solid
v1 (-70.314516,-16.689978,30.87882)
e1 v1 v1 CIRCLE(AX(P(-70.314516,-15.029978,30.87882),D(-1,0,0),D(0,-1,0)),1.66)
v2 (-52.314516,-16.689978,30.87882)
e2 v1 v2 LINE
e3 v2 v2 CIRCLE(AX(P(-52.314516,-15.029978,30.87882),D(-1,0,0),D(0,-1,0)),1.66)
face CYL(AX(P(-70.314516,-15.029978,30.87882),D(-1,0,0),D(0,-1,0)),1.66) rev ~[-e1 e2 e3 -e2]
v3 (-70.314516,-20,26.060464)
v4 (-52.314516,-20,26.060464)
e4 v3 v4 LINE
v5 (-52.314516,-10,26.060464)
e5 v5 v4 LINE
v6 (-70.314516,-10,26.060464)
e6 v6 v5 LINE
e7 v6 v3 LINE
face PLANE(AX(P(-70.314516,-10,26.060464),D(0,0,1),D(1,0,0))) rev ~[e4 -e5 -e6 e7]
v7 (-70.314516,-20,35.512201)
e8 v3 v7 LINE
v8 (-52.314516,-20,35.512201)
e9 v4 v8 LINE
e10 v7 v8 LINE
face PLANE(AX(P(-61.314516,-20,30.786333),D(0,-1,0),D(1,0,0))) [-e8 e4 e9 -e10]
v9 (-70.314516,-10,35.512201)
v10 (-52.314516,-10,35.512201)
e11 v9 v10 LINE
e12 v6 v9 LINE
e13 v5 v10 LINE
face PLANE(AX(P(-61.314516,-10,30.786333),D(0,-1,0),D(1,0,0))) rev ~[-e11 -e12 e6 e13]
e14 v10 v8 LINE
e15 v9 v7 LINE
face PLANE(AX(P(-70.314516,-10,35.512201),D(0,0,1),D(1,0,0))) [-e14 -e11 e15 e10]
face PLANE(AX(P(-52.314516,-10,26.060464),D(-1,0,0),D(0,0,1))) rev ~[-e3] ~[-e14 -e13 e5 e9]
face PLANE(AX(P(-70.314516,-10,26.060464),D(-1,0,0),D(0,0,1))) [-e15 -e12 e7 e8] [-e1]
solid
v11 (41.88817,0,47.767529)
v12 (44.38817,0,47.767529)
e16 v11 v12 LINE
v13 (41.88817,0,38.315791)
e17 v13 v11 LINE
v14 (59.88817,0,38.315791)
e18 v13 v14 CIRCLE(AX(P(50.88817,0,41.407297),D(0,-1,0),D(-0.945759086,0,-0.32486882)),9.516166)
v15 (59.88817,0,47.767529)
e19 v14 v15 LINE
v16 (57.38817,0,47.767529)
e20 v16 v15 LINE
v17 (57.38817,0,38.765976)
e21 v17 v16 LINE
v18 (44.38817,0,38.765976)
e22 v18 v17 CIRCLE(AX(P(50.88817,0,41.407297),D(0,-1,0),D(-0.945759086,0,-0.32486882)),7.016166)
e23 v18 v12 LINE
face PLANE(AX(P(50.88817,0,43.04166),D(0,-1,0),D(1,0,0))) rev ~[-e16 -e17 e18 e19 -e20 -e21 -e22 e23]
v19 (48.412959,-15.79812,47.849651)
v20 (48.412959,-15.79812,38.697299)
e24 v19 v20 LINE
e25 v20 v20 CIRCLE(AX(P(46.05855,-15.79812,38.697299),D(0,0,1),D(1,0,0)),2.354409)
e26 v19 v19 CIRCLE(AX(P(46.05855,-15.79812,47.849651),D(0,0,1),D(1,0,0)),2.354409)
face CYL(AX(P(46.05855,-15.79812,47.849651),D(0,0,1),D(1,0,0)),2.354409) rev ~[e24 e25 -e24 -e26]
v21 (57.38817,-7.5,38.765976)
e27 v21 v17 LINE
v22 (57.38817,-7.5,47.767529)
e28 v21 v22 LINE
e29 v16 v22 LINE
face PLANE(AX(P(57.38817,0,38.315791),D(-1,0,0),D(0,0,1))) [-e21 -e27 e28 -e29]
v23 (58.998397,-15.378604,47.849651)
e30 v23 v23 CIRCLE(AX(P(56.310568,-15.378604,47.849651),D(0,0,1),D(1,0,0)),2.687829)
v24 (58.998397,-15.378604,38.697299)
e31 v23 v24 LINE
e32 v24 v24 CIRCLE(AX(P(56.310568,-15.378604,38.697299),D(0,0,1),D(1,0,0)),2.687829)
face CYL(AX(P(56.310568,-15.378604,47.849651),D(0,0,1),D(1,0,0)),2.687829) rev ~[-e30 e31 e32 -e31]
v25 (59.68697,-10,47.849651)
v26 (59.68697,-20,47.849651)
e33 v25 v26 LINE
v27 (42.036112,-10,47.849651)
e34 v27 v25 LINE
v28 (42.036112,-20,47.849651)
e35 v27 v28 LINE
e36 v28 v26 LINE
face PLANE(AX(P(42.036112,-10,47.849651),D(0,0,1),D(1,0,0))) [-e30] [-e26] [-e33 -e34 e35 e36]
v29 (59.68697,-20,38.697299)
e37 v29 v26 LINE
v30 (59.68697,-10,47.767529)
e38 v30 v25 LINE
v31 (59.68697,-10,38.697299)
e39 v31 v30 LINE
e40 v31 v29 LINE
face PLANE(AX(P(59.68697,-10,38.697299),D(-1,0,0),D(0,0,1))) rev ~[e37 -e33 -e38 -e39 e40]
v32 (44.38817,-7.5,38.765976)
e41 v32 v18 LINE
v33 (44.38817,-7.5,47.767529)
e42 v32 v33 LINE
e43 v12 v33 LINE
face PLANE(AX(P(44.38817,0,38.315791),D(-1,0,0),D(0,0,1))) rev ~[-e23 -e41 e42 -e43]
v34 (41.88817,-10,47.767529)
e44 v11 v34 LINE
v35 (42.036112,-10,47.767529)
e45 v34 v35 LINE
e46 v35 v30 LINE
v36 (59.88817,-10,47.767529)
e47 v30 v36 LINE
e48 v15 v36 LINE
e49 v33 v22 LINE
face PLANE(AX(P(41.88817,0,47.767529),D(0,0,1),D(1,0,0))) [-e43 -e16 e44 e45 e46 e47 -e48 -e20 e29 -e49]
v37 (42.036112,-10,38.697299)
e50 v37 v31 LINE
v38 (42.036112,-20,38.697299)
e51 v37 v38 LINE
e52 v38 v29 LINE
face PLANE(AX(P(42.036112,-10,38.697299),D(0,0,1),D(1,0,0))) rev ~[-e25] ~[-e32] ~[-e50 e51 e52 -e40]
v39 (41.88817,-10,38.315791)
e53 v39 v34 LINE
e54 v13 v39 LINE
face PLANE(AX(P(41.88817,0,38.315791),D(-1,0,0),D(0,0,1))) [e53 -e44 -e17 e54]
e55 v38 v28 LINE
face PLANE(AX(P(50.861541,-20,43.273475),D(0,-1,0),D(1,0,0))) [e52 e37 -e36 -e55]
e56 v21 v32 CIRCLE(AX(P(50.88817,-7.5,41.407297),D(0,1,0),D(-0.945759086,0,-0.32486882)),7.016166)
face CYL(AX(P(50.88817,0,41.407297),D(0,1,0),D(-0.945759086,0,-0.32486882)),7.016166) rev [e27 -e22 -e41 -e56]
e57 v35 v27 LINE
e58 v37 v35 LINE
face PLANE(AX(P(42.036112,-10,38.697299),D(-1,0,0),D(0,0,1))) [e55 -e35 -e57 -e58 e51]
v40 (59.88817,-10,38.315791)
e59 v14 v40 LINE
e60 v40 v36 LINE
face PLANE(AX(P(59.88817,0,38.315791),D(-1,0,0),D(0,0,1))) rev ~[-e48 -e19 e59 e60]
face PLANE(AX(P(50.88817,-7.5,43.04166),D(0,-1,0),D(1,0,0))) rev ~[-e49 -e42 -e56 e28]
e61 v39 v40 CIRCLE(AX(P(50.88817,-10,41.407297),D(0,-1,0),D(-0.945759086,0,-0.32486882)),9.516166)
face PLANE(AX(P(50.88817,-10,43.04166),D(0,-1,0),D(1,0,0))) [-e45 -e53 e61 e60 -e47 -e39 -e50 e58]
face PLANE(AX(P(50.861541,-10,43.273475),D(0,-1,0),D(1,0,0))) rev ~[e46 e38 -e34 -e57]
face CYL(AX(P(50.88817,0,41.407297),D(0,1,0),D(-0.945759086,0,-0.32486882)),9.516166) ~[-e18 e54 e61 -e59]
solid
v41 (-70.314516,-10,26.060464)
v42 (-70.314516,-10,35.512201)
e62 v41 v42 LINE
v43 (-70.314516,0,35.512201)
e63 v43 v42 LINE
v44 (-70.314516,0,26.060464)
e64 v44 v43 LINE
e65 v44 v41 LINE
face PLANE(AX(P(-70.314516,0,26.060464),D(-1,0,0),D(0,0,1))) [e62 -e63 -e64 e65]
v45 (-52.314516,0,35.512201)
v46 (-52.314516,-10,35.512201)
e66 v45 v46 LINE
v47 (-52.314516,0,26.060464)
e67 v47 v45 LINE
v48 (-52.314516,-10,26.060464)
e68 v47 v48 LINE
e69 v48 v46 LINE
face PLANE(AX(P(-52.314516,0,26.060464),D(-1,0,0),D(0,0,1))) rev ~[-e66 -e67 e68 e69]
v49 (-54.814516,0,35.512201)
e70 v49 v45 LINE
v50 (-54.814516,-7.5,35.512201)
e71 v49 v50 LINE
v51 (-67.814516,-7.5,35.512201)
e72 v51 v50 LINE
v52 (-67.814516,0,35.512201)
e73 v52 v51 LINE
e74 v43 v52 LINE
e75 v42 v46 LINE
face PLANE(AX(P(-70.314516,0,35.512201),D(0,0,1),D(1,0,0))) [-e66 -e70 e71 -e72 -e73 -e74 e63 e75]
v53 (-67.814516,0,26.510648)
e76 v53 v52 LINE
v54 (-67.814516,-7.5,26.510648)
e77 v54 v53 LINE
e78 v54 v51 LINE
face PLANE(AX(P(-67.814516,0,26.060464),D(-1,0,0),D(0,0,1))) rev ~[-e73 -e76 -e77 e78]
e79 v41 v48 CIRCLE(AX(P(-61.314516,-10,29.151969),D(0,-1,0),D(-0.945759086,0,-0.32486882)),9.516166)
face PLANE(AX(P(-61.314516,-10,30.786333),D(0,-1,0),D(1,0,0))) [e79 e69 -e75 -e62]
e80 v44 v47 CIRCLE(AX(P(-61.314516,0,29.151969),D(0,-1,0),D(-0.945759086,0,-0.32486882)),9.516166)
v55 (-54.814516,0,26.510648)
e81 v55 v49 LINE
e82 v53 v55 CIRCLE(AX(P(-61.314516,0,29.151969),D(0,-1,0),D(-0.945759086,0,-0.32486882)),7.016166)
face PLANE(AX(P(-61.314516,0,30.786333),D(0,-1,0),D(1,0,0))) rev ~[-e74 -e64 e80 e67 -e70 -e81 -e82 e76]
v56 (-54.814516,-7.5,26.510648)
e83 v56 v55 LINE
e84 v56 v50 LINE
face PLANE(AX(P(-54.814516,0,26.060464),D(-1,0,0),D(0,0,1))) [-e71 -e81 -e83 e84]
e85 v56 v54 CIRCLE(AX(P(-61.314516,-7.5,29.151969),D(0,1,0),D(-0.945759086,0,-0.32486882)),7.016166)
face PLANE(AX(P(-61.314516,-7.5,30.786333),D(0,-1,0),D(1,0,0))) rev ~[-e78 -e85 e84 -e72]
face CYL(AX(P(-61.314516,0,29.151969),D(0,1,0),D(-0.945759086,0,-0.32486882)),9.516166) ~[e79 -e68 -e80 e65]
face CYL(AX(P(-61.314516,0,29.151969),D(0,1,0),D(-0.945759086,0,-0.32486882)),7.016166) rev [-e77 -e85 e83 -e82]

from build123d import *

# Parameters (mm, degrees)
F0_W     = 18
F0_H     = 9.451737664
F1_DEPTH = 10
F2_T     = -2.5
F2_2_T   = -2.5
F3_W     = 18
F3_H     = 9.451737664
F4_DEPTH = 10
F3_W_2   = 17.6508575678
F3_H_2   = 9.1523528099
F5_R     = 2.6878293193
F5_R_2   = 2.3544087044
F6_DEPTH = 25
F7_R     = 1.66
F8_DEPTH = 25


with BuildPart() as f1:
    # F0 (on Front) → F1 (new body)
    with BuildSketch(Plane.XZ):
        with Locations((-61.3145157695, 30.7863325212)):
            Rectangle(F0_W, F0_H)
        with BuildLine():
            Line((-52.3145157695, 26.0604636891), (-70.3145157695, 26.0604636891))
            ThreePointArc((-70.3145157695, 26.0604636891), (-61.3145157695, 19.6358036407), (-52.3145157695, 26.0604636891))
        make_face()
    extrude(amount=F1_DEPTH)

    # F2
    f2_openings = [f1.faces().sort_by_distance(p)[0] for p in [
        (-61.314516, -5, 35.512201),
        (-61.314516, 0, 28.335197),
    ]]
    offset(amount=F2_T, openings=f2_openings)


with BuildPart() as f1b:
    # F0 (on Front) → F1, piece 2 (new body)
    with BuildSketch(Plane.XZ):
        with Locations((50.8881695569, 43.0416602246)):
            Rectangle(F0_W, F0_H)
        with BuildLine():
            Line((59.8881695569, 38.3157913926), (41.8881695569, 38.3157913926))
            ThreePointArc((41.8881695569, 38.3157913926), (50.8881695569, 31.8911313442), (59.8881695569, 38.3157913926))
        make_face()
    extrude(amount=F1_DEPTH)

    # F2#2
    f2_2_openings = [f1b.faces().sort_by_distance(p)[0] for p in [
        (50.88817, 0, 40.590525),
        (50.88817, -5, 47.767529),
    ]]
    offset(amount=F2_2_T, openings=f2_2_openings)

    # F3 (on face) → F4, piece 2 (join)
    with BuildSketch(Plane.XZ.offset(10)):
        with Locations((50.8615411818, 43.2734750211)):
            Rectangle(F3_W_2, F3_H_2)
    extrude(amount=F4_DEPTH)

    # F5 (on face) → F6 (cut)
    with BuildSketch(Plane.XY.offset(47.8496514261)):
        with Locations((56.3105680048, -15.3786037117)):
            Circle(F5_R)
        with Locations((46.058550477, -15.7981198281)):
            Circle(F5_R_2)
    extrude(amount=-F6_DEPTH, mode=Mode.SUBTRACT)


with BuildPart() as f4:
    # F3 (on face) → F4 (new body)
    with BuildSketch(Plane.XZ.offset(10)):
        with Locations((-61.3145157695, 30.7863325212)):
            Rectangle(F3_W, F3_H)
    extrude(amount=F4_DEPTH)

    # F7 (on face) → F8 (cut)
    with BuildSketch(Plane(origin=(-70.3145157695, 0, 0), x_dir=(0, -1, 0), z_dir=(-1, 0, 0))):
        with Locations((15.0299780071, 30.8788195252)):
            Circle(F7_R)
    extrude(amount=-F8_DEPTH, mode=Mode.SUBTRACT)


solid = Compound([f1.part, f1b.part, f4.part])
